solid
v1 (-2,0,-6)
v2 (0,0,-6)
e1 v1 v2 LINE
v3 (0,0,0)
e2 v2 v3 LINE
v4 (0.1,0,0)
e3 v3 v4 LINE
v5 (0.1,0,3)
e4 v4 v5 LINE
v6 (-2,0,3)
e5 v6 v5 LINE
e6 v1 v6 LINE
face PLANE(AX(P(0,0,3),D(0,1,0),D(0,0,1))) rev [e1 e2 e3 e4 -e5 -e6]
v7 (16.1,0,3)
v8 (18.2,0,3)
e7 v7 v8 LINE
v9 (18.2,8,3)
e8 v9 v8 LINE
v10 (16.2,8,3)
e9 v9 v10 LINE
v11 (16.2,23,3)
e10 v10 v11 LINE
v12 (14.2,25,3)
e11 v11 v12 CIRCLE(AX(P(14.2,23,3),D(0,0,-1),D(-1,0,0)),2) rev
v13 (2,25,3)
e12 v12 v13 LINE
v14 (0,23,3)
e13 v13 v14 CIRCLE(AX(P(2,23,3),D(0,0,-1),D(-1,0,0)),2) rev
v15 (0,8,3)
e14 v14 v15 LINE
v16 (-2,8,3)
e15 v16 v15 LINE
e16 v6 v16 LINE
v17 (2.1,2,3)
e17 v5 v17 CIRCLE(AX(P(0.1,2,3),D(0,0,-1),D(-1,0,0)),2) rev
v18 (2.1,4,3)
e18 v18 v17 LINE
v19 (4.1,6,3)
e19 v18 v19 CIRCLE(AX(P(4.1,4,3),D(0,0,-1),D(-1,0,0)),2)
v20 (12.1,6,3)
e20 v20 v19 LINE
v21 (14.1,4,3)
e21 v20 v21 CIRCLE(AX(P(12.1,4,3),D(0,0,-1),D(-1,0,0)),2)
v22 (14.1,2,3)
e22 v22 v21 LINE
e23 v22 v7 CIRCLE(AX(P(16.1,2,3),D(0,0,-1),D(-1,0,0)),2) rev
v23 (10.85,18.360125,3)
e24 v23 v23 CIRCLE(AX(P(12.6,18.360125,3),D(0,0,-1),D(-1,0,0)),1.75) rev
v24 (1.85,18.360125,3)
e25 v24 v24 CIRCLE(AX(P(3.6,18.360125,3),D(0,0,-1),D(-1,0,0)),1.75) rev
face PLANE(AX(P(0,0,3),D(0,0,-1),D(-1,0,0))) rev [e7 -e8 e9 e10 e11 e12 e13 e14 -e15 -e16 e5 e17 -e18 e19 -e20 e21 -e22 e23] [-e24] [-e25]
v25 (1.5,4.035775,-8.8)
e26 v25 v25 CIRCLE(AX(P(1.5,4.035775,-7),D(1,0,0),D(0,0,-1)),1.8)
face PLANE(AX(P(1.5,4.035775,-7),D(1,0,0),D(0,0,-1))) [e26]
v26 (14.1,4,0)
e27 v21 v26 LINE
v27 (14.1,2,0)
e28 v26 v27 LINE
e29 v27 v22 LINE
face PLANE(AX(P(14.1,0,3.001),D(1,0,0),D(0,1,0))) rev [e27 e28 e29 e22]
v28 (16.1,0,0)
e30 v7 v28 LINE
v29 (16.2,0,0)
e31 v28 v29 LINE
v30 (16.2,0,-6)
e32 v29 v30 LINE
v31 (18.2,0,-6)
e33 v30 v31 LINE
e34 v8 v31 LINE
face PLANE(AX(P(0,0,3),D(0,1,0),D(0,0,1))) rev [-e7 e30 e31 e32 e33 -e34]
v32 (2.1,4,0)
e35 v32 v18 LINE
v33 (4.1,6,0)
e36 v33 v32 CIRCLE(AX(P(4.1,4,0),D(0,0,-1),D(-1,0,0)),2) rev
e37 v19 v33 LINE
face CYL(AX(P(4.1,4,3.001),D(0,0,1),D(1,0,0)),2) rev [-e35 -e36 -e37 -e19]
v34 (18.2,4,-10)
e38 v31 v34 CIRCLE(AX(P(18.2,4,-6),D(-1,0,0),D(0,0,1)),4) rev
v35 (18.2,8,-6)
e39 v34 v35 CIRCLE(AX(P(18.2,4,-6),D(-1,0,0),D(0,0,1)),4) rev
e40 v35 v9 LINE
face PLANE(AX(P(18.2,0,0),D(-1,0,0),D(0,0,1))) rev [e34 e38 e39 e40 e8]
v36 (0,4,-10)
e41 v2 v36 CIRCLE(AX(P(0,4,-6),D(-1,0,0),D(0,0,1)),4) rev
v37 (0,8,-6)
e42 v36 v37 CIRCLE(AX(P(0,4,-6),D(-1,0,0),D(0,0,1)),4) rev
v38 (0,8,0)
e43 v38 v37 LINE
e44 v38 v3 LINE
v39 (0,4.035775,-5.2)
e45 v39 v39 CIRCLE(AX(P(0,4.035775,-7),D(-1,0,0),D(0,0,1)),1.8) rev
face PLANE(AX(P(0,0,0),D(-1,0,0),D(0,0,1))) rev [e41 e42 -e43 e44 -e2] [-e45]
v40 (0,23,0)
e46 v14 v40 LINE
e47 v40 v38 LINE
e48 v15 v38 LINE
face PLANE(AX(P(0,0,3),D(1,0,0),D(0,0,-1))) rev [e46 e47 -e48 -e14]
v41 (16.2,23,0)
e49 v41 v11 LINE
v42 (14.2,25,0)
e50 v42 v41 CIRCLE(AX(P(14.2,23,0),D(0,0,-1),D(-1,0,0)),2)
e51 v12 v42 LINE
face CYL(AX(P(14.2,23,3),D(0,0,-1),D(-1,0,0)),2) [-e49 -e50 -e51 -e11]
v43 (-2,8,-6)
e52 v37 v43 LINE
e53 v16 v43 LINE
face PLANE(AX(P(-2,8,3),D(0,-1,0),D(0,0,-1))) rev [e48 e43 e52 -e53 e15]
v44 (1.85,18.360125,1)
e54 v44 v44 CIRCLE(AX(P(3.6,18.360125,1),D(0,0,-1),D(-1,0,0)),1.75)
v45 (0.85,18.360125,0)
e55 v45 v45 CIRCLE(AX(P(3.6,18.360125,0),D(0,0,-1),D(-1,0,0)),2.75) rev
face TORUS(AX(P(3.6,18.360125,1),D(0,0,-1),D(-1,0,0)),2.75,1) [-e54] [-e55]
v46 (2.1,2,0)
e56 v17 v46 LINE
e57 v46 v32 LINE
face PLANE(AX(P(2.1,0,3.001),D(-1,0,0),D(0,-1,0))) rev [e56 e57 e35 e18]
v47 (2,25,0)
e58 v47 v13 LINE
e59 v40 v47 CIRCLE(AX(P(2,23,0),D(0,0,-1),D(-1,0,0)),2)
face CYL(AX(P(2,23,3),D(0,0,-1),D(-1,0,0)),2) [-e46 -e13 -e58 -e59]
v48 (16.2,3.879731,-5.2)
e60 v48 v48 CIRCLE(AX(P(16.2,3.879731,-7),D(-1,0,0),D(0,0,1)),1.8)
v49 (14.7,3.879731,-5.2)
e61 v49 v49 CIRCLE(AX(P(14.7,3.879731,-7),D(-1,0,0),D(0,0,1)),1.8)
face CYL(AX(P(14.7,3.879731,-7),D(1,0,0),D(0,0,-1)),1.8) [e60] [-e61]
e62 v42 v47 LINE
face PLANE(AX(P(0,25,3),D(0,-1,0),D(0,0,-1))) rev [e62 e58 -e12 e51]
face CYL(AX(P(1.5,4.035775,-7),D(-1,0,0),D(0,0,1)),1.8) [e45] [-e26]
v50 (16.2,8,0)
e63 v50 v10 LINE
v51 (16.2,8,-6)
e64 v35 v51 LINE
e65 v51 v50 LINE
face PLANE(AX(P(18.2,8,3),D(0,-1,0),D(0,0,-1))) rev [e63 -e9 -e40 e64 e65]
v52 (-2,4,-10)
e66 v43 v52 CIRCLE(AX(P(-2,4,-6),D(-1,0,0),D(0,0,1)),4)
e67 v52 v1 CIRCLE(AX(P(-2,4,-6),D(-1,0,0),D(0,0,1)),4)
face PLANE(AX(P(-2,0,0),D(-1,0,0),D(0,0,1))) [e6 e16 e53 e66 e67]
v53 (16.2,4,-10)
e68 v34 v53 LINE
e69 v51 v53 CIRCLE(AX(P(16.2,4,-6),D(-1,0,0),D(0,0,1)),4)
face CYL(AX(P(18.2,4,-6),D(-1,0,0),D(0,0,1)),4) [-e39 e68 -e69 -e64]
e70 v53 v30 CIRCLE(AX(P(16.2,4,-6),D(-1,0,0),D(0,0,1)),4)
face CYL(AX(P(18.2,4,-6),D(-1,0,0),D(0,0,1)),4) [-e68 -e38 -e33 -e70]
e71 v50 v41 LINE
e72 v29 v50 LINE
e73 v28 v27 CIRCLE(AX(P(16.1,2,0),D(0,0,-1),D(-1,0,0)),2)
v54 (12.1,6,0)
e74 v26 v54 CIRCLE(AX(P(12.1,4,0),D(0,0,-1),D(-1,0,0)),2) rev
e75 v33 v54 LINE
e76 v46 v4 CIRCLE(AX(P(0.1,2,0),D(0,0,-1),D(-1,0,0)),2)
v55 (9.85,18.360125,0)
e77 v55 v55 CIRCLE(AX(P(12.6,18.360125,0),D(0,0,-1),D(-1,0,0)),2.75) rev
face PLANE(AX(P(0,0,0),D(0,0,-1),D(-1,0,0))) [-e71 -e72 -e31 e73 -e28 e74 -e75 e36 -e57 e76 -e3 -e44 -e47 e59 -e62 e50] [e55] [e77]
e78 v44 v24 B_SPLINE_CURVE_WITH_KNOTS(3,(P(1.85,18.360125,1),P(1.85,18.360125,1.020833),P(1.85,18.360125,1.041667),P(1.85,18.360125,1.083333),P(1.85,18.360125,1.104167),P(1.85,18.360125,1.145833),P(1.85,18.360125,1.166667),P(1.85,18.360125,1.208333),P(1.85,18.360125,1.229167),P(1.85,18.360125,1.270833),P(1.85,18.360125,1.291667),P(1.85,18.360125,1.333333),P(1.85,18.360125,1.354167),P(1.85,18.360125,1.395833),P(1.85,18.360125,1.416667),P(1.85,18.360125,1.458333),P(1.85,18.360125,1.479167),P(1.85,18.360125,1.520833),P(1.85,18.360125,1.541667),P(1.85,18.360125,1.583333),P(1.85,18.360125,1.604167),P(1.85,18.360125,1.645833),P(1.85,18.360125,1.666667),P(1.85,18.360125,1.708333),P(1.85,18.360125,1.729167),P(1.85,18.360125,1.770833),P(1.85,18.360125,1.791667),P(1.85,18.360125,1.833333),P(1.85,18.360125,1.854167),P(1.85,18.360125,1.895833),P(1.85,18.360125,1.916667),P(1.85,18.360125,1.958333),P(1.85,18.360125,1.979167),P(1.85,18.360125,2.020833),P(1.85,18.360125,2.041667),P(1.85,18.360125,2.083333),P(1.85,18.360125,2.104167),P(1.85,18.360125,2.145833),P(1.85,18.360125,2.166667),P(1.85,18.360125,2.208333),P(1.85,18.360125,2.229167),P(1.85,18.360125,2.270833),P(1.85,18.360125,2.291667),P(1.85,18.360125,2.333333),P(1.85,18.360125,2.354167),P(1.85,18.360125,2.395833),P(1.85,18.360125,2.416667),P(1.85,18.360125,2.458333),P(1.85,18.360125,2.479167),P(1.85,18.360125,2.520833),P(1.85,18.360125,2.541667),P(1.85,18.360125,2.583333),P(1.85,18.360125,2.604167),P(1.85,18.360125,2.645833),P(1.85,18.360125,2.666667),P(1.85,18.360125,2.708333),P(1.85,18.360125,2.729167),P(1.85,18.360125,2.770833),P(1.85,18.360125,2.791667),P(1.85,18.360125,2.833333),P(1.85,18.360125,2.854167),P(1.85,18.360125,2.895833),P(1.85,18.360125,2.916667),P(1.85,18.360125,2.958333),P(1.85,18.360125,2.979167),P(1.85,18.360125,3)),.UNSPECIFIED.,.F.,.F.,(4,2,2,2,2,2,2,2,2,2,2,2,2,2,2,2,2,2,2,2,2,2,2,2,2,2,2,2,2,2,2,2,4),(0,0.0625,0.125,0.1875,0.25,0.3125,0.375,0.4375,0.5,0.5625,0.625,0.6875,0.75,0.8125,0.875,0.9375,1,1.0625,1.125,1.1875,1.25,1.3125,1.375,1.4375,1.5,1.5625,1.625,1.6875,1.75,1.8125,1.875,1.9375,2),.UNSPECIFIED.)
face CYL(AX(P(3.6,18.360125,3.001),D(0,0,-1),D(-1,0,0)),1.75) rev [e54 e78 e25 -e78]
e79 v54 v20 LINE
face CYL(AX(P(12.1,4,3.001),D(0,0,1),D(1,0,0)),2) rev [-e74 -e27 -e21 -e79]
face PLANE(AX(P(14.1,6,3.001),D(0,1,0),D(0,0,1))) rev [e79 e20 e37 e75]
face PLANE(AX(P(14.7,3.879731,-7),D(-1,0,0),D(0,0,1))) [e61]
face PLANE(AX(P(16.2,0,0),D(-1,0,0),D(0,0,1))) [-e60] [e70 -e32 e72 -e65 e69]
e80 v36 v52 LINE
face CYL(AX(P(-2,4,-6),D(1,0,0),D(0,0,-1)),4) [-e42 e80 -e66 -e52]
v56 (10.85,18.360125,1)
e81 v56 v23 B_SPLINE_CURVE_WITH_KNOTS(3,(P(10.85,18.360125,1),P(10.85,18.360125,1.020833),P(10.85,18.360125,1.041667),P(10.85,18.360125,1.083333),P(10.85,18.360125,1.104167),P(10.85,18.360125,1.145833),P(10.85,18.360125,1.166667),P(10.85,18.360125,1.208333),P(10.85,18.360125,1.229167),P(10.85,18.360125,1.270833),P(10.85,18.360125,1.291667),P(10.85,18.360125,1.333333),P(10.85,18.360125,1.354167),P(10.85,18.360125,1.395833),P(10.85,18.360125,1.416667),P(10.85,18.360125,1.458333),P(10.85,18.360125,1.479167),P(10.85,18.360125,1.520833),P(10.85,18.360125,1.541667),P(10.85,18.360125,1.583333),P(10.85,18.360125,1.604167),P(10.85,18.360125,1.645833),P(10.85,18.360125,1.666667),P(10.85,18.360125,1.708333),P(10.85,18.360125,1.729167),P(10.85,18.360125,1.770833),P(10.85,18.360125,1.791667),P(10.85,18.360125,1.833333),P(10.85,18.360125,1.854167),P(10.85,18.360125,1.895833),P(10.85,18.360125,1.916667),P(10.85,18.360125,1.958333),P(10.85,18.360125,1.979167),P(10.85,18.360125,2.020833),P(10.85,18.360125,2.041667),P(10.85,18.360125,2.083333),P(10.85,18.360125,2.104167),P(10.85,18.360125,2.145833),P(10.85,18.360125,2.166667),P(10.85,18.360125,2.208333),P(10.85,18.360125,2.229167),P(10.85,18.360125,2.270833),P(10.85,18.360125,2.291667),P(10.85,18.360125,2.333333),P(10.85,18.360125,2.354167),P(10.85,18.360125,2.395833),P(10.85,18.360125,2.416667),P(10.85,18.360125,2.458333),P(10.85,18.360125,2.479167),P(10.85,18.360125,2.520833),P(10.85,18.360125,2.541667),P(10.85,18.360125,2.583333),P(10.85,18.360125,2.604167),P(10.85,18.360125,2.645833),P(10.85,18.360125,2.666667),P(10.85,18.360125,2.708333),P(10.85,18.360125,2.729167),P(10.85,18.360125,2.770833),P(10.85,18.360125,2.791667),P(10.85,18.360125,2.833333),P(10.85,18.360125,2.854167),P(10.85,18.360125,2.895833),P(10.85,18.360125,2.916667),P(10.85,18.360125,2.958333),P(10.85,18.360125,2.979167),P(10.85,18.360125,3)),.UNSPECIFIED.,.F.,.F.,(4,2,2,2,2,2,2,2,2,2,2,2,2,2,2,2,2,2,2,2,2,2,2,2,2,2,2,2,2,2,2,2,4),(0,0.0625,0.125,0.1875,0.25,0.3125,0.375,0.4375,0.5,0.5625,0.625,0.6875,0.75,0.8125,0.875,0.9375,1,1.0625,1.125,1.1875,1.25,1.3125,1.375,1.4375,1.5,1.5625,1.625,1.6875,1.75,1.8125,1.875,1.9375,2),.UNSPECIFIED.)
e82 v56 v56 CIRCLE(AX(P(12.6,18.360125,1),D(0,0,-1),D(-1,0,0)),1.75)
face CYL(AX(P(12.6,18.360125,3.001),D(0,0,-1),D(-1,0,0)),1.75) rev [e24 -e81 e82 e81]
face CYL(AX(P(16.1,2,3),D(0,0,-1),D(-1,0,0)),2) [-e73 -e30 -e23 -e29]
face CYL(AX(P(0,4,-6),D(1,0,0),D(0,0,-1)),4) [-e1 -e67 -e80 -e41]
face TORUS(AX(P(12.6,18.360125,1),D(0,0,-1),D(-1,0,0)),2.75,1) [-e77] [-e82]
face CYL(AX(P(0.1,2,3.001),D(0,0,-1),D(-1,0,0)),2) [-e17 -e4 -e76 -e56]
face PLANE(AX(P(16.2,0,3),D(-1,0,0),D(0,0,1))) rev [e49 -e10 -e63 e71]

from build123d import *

# Parameters (mm, degrees)
ESQUISSE1_W             = 16.2
ESQUISSE1_H             = 25
BOSS_EXTRU_1_DEPTH      = 3
ESQUISSE2_W             = 13
ESQUISSE2_H             = 8
BOSS_EXTRU_2_DEPTH      = 2
ESQUISSE3_R             = 1.8
BOSS_EXTRU_3_DEPTH      = 1.5
ESQUISSE5_W             = 13
ESQUISSE5_H             = 8
BOSS_EXTRU_4_DEPTH      = 2
ESQUISSE6_R             = 1.8
BOSS_EXTRU_5_DEPTH      = 1.5
ENL_V_MAT_EXTRU_1_REACH = 34.5
ESQUISSE7_W             = 12
ESQUISSE7_H             = 6
ENL_V_MAT_EXTRU_2_REACH = 34.5
ESQUISSE8_R             = 1.75
CONG_1_R                = 1
CONG_2_R                = 4
CONG_3_R                = 2
CONG_4_R                = 2


with BuildPart() as part:
    # Esquisse1 → Boss.-Extru.1 (new body)
    with BuildSketch(Plane.XY):
        with Locations((8.1, 12.5)):
            Rectangle(ESQUISSE1_W, ESQUISSE1_H)
    extrude(amount=BOSS_EXTRU_1_DEPTH)

    # Esquisse2 → Boss.-Extru.2 (add)
    with BuildSketch(Plane.ZY):
        with Locations((-3.5, 4)):
            Rectangle(ESQUISSE2_W, ESQUISSE2_H)
    extrude(amount=BOSS_EXTRU_2_DEPTH)

    # Esquisse3 → Boss.-Extru.3 (add)
    with BuildSketch(Plane(origin=(0, 0, 0), x_dir=(0, 0, -1), z_dir=(1, 0, 0))):
        with Locations(Location((7, 4.035774971, 0), (0, 0, 180))):
            Circle(ESQUISSE3_R)
    extrude(amount=BOSS_EXTRU_3_DEPTH)

    # Esquisse5 → Boss.-Extru.4 (add)
    with BuildSketch(Plane(origin=(16.2, 0, 0), x_dir=(0, 0, -1), z_dir=(1, 0, 0))):
        with Locations((3.5, 4)):
            Rectangle(ESQUISSE5_W, ESQUISSE5_H)
    extrude(amount=BOSS_EXTRU_4_DEPTH)

    # Esquisse6 → Boss.-Extru.5 (add)
    with BuildSketch(Plane.ZY.offset(-16.2)):
        with Locations((-7, 3.879731229)):
            Circle(ESQUISSE6_R)
    extrude(amount=BOSS_EXTRU_5_DEPTH)

    # Esquisse7 → Enlèv. mat.-Extru.1 (cut, up to next)
    with BuildSketch(Plane(origin=(0, 0, 0), x_dir=(-1, 0, 0), z_dir=(0, 0, -1)), mode=Mode.PRIVATE) as enl_v_mat_extru_1_sk1:
        with Locations((-8.1, 3)):
            Rectangle(ESQUISSE7_W, ESQUISSE7_H)
    enl_v_mat_extru_1_tool1 = extrude(enl_v_mat_extru_1_sk1.sketch, amount=-ENL_V_MAT_EXTRU_1_REACH, mode=Mode.PRIVATE) & part.part
    add(enl_v_mat_extru_1_tool1.solids().sort_by_distance((8.1, 3, 0))[0], mode=Mode.SUBTRACT)

    # Esquisse8 → Enlèv. mat.-Extru.2 (cut, up to next)
    with BuildSketch(Plane(origin=(0, 0, 0), x_dir=(-1, 0, 0), z_dir=(0, 0, -1)), mode=Mode.PRIVATE) as enl_v_mat_extru_2_sk1:
        with Locations((-12.6, 18.360124913)):
            Circle(ESQUISSE8_R)
    enl_v_mat_extru_2_tool1 = extrude(enl_v_mat_extru_2_sk1.sketch, amount=-ENL_V_MAT_EXTRU_2_REACH, mode=Mode.PRIVATE) & part.part
    # Esquisse8 → Enlèv. mat.-Extru.2 (cut, up to next)
    with BuildSketch(Plane(origin=(0, 0, 0), x_dir=(-1, 0, 0), z_dir=(0, 0, -1)), mode=Mode.PRIVATE) as enl_v_mat_extru_2_sk2:
        with Locations((-3.6, 18.360124913)):
            Circle(ESQUISSE8_R)
    enl_v_mat_extru_2_tool2 = extrude(enl_v_mat_extru_2_sk2.sketch, amount=-ENL_V_MAT_EXTRU_2_REACH, mode=Mode.PRIVATE) & part.part
    add(enl_v_mat_extru_2_tool1.solids().sort_by_distance((12.6, 18.360125, 0))[0], mode=Mode.SUBTRACT)
    add(enl_v_mat_extru_2_tool2.solids().sort_by_distance((3.6, 18.360125, 0))[0], mode=Mode.SUBTRACT)

    # Congé1
    cong_1_edges = [part.edges().sort_by_distance(p)[0] for p in [
        (14.35, 18.360124913, 0),
        (5.35, 18.360124913, 0),
    ]]
    fillet(cong_1_edges, radius=CONG_1_R)

    # Congé2
    cong_2_edges = [part.edges().sort_by_distance(p)[0] for p in [
        (-1, 8, -10),
        (-1, 0, -10),
        (17.2, 0, -10),
        (17.2, 8, -10),
    ]]
    fillet(cong_2_edges, radius=CONG_2_R - 0.0001)  # a hair under: the kernel refuses the full size

    # Congé3
    cong_3_edges = [part.edges().sort_by_distance(p)[0] for p in [
        (14.1, 0, 1.5),
        (14.1, 6, 1.5),
        (2.1, 6, 1.5),
        (2.1, 0, 1.5),
    ]]
    fillet(cong_3_edges, radius=CONG_3_R)

    # Congé4
    cong_4_edges = [part.edges().sort_by_distance(p)[0] for p in [
        (0, 25, 1.5),
        (16.2, 25, 1.5),
    ]]
    fillet(cong_4_edges, radius=CONG_4_R)


solid = part.part
